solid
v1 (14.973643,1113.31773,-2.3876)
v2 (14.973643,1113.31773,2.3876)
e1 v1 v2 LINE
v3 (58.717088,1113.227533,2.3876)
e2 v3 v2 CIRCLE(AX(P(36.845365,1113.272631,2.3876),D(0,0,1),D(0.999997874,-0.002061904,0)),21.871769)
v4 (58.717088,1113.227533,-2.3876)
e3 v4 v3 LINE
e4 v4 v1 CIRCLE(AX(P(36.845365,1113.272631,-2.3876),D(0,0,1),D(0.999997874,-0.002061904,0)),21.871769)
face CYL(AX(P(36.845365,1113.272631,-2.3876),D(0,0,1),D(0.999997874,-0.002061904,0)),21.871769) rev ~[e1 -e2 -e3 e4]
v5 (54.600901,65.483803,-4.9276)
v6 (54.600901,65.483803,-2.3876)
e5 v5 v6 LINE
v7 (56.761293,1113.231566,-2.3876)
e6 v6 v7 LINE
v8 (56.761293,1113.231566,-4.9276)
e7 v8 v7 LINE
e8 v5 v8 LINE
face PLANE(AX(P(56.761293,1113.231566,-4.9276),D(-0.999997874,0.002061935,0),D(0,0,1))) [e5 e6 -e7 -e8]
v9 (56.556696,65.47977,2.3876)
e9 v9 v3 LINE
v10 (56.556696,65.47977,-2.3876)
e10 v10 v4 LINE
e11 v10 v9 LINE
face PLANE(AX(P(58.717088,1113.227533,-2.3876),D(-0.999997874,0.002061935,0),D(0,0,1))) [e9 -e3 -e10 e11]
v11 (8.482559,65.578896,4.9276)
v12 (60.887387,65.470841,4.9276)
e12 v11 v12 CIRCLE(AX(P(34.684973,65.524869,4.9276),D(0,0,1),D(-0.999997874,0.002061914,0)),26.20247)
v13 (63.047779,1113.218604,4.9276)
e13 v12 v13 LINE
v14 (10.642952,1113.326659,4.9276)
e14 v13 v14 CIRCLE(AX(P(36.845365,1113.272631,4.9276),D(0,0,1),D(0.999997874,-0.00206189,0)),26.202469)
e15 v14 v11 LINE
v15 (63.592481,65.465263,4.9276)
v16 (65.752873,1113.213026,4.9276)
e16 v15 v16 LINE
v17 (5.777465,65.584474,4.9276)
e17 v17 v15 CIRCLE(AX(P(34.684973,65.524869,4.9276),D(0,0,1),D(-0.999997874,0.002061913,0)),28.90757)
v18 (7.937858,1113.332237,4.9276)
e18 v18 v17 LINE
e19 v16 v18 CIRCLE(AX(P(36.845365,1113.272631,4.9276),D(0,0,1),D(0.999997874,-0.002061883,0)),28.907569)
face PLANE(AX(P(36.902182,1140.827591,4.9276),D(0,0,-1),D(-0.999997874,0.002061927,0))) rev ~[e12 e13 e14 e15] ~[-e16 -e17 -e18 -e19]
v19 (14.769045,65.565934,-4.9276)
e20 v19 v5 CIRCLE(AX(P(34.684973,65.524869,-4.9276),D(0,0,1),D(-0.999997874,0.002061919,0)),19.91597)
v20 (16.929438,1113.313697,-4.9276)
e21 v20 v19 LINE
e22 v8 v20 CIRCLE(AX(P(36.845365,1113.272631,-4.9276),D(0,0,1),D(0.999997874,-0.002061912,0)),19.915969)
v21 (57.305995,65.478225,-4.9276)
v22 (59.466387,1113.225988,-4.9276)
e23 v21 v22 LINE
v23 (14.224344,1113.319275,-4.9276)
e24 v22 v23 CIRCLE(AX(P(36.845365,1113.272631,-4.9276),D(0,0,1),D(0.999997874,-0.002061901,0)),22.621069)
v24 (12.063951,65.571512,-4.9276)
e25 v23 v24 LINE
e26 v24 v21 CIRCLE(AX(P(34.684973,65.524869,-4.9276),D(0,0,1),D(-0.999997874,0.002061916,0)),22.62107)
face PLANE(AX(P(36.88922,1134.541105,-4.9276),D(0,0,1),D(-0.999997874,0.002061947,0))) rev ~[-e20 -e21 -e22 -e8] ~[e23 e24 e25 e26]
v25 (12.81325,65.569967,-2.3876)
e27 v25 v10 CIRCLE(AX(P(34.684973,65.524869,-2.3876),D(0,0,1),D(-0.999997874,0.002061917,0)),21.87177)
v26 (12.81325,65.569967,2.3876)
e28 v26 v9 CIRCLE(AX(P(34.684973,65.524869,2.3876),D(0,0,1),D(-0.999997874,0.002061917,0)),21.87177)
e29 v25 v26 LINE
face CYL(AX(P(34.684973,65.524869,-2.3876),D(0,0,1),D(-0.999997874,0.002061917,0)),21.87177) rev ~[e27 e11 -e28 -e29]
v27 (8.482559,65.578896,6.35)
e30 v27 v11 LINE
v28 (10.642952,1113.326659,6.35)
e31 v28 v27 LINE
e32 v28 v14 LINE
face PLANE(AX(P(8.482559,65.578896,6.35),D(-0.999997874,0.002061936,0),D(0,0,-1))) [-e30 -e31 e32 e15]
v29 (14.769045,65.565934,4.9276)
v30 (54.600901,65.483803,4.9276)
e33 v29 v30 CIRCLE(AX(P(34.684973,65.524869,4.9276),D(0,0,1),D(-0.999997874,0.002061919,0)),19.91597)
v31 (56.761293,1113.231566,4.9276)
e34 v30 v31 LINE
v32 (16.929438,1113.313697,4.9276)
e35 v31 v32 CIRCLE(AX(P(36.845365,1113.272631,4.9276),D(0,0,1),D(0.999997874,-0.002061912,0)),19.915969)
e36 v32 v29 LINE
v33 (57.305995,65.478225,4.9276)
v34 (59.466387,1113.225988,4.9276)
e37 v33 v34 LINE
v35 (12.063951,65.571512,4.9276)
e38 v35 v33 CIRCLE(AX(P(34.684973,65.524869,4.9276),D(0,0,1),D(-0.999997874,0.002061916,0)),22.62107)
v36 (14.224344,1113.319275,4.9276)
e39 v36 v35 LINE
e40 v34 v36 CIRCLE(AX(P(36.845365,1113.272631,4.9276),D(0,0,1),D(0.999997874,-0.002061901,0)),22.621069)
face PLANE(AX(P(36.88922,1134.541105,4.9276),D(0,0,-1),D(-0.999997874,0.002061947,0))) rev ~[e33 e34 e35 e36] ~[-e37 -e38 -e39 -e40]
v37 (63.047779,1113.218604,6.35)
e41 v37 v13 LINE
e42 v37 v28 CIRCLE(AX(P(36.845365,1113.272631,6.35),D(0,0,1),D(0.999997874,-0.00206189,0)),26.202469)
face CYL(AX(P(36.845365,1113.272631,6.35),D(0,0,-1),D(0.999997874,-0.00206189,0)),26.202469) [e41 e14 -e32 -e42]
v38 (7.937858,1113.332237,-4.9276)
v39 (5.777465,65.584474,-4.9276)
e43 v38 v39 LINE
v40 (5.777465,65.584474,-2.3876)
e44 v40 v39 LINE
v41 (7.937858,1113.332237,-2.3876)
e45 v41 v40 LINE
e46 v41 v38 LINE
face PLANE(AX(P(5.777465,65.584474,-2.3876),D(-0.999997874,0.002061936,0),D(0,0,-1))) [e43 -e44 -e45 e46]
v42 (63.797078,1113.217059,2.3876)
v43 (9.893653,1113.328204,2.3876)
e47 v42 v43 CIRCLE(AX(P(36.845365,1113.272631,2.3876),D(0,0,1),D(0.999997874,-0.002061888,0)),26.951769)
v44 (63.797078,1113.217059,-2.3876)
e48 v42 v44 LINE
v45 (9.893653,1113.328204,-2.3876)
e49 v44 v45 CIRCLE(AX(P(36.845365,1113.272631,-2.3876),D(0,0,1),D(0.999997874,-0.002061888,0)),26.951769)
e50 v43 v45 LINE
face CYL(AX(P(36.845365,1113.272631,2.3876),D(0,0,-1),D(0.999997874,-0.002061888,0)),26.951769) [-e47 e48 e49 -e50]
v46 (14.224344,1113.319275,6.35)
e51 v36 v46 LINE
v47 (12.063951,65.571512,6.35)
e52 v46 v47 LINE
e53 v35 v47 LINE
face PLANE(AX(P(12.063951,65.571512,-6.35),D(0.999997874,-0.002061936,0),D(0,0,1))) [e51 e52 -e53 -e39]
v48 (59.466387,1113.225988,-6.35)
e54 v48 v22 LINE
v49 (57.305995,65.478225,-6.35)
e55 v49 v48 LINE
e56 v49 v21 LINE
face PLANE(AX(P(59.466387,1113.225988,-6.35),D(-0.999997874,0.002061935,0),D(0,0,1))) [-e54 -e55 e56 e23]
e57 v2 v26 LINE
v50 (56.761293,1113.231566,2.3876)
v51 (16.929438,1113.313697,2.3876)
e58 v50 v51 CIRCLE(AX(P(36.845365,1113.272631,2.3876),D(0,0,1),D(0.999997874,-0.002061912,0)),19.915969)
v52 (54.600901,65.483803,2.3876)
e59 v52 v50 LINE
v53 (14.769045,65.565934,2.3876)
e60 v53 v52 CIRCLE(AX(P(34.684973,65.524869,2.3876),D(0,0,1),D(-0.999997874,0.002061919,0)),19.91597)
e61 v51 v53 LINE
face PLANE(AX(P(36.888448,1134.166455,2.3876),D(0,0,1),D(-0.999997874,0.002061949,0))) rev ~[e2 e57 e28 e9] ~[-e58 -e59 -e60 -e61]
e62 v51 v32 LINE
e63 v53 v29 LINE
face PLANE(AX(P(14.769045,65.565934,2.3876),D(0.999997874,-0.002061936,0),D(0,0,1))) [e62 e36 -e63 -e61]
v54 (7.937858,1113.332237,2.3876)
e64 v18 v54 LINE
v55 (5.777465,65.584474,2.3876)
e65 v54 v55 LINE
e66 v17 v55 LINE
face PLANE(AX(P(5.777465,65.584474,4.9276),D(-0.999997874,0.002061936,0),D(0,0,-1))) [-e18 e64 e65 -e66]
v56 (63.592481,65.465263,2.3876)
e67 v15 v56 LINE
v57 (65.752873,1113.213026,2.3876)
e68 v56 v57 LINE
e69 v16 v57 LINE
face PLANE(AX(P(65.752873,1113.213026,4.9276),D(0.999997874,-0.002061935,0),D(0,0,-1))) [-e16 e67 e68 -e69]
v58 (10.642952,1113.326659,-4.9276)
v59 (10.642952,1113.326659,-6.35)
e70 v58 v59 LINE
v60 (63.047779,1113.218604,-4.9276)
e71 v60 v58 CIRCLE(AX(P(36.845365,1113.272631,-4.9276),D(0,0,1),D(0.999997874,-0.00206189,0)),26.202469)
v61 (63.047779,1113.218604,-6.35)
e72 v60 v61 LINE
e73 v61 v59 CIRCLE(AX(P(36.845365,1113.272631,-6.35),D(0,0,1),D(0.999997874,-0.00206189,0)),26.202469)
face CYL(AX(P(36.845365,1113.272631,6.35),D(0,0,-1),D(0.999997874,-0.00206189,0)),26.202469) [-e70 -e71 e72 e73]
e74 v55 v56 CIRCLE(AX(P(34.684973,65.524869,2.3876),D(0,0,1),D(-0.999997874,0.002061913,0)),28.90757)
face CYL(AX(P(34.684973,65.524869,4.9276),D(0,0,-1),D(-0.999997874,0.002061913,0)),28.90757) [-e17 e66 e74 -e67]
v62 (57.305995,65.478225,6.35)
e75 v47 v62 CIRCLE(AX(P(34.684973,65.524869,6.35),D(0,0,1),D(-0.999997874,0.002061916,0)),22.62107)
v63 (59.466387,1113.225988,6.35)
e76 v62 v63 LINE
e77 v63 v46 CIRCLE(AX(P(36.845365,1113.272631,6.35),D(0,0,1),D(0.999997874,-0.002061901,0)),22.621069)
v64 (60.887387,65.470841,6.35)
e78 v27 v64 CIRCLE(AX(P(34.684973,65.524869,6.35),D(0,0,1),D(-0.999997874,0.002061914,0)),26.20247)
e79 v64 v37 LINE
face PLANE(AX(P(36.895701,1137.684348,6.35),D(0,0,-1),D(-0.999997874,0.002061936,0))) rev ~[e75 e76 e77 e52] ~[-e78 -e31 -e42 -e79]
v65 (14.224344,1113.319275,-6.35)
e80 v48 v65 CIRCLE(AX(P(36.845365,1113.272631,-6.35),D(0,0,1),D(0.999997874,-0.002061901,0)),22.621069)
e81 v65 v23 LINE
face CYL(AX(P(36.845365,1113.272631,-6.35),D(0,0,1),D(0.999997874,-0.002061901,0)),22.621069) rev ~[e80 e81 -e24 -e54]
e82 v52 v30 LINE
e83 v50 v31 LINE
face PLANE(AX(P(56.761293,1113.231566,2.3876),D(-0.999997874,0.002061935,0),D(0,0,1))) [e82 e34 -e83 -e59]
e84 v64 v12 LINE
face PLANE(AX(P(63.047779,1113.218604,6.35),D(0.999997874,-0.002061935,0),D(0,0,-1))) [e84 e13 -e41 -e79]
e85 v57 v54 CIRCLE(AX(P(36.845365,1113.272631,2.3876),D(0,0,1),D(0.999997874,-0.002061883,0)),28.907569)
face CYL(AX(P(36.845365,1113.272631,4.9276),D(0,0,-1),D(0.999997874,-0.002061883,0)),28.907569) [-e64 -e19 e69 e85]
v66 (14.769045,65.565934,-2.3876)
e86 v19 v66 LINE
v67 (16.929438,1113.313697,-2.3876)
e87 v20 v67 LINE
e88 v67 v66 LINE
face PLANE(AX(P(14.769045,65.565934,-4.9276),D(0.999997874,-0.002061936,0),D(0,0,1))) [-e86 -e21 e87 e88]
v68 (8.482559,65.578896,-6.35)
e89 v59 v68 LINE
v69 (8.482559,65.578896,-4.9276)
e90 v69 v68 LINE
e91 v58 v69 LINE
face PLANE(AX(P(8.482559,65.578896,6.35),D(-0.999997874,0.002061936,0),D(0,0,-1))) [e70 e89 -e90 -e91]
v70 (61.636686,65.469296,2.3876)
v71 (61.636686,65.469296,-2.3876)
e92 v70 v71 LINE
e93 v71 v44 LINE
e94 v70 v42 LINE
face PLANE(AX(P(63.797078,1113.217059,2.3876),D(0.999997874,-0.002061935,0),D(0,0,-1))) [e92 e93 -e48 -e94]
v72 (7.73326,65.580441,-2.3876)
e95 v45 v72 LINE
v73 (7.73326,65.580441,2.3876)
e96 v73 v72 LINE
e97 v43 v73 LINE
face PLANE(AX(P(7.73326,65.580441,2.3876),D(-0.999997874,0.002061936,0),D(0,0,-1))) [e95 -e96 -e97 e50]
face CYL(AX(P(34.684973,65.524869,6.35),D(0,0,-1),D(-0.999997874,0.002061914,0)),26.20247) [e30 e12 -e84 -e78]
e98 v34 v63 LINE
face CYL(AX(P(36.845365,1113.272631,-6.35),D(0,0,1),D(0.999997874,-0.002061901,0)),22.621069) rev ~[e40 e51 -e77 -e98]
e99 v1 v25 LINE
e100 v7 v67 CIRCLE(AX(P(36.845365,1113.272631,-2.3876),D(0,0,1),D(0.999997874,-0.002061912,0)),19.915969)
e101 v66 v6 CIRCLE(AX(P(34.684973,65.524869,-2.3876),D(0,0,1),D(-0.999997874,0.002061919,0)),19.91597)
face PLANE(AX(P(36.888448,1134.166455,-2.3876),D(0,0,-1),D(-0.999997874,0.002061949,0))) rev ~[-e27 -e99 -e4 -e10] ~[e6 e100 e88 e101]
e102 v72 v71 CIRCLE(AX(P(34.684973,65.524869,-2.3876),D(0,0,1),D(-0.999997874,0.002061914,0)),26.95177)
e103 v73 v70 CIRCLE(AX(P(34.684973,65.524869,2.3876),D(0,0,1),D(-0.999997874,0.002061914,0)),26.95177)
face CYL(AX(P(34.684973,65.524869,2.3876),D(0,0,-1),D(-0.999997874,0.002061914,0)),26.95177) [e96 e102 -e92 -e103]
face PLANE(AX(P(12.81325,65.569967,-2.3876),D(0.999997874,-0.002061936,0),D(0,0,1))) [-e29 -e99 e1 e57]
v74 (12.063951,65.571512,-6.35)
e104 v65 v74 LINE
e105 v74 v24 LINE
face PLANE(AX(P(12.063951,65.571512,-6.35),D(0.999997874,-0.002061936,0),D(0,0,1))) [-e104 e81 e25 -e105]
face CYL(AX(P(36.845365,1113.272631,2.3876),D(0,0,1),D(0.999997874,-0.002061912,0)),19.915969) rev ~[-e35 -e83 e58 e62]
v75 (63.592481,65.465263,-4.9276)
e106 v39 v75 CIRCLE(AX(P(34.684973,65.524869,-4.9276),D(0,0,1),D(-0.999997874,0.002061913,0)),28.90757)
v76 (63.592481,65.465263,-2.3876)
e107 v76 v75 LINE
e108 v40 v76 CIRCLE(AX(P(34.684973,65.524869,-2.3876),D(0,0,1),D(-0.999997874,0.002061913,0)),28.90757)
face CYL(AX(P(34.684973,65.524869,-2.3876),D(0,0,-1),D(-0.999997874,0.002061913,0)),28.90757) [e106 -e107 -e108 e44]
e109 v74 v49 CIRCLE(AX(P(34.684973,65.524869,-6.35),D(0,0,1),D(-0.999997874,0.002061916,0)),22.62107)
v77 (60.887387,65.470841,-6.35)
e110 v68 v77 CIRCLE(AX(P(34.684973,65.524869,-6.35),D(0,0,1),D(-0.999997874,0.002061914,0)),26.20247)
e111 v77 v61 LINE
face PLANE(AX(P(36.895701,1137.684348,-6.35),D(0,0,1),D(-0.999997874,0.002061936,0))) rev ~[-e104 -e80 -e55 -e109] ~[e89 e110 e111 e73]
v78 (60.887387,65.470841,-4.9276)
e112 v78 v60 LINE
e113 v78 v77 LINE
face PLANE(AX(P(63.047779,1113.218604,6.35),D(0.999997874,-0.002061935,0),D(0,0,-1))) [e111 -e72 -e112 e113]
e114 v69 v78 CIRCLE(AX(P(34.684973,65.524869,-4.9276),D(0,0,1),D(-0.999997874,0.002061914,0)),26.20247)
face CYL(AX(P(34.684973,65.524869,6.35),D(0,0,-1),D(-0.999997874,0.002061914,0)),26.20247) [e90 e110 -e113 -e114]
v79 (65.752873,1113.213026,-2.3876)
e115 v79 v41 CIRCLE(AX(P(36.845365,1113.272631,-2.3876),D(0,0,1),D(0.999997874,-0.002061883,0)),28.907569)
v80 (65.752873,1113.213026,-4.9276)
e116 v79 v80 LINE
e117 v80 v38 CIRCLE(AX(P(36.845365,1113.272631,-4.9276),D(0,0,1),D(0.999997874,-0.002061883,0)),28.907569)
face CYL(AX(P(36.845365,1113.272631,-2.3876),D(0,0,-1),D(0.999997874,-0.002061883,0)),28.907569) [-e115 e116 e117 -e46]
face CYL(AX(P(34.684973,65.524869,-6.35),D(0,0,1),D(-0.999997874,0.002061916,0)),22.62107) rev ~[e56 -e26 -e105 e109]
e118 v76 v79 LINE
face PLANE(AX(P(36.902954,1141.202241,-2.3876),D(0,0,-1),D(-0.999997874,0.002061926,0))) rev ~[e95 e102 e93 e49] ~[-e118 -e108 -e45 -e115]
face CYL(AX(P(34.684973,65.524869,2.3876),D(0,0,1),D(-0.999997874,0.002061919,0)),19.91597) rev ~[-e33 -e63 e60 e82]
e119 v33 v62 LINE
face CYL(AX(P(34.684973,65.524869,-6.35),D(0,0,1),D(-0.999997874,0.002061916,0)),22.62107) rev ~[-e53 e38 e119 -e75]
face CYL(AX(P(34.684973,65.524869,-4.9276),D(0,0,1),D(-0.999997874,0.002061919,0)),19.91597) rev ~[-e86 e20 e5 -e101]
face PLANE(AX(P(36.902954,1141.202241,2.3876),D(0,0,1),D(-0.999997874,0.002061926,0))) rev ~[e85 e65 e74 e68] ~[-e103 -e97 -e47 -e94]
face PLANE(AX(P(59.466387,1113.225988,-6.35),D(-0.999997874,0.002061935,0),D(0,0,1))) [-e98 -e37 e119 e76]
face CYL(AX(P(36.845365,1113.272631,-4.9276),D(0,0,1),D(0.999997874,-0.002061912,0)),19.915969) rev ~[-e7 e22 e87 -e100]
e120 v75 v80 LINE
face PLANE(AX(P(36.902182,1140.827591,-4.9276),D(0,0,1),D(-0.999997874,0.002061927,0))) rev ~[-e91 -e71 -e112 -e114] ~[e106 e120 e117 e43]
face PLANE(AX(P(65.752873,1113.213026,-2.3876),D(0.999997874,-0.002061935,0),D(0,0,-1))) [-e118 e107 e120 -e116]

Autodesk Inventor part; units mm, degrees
ref_plane "Work Plane2" through (36.845366, 1113.272631, 0) normal (-1, 0, 0) x (0, 0, 1)
ref_plane "Work Plane3" through (34.684973, 65.524869, 0) normal (0.3826834, 0.9238795, 0) x (0, 0, 1)
sketch "Path" plane through (0, 0, 0) normal (0, 0, 1) x (1, 0, 0)
  arc A0 (61.257083, 1113.222296) -> (12.433648, 1113.322967) centre (36.845366, 1113.272631) ccw
  arc A1 (10.273255, 65.575204) -> (59.096691, 65.474533) centre (34.684973, 65.524869) ccw
  line L0 (10.273255, 65.575204) -> (12.433648, 1113.322967)
  line L1 (61.257083, 1113.222296) -> (59.096691, 65.474533)
  dimension "d31" = 8.9916
ref_plane "Section Plane" through (12.433648, 1113.322967, 0) normal (-0.0020619, -0.9999979, 0) x (0, 0, 1)
sketch "Section Sketch" plane through (12.433648, 1113.322967, 0) normal (-0.0020619, -0.9999979, 0) x (0, 0, 1)
  line L0 (-6.35, -1.7907) -> (6.35, -1.7907)
  line L1 (6.35, -1.7907) -> (6.35, 1.7907)
  line L2 (6.35, 1.7907) -> (-6.35, 1.7907)
  line L3 (-6.35, 1.7907) -> (-6.35, -1.7907)
  line L4 (-2.3876, -2.54) -> (2.3876, -2.54)
  line L5 (2.3876, -2.54) -> (2.3876, 2.54)
  line L6 (2.3876, 2.54) -> (-2.3876, 2.54)
  line L7 (-2.3876, 2.54) -> (-2.3876, -2.54)
  line L8 (-2.3876, 0) -> (2.3876, 0) construction
  line L9 (-4.9276, -4.4958) -> (-2.3876, -4.4958)
  line L10 (-2.3876, -4.4958) -> (-2.3876, 4.4958)
  line L11 (-2.3876, 4.4958) -> (-4.9276, 4.4958)
  line L12 (-4.9276, 4.4958) -> (-4.9276, -4.4958)
  line L13 (2.3876, -4.4958) -> (4.9276, -4.4958)
  line L14 (4.9276, -4.4958) -> (4.9276, 4.4958)
  line L15 (4.9276, 4.4958) -> (2.3876, 4.4958)
  line L16 (2.3876, 4.4958) -> (2.3876, -4.4958)
  line L17 (-6.35, 0) -> (6.35, 0) construction
  point P0 (0, 0)
  point P1 (0, 0)
  dimension "d21" = 3.5814
  dimension "d22" = 5.08
  dimension "d23" = 4.7752
  dimension "d24" = 2.54
  dimension "d31" = 8.9916
  dimension "d32" = 12.7
sweep "Solid" add profiles "Section Sketch" path "Path"
pattern_of_one "Strand Pattern"
equation "\"d21\" = da_d2"
equation "\"d22\" = da_d1"
equation "\"d23\" = da_b1"
equation "\"d24\" = da_t1 + da_t2"
equation "\"d30\" = da_pt"
equation "\"da_p\" = 9.525"
equation "\"da_b1\" = 4.7752"
equation "\"da_h2\" = 8.9916"
equation "\"da_h3\" = 7.7978"
equation "\"da_d1\" = 5.08"
equation "\"da_d2\" = 3.5814"
equation "\"da_pt\" = 10.1346"
equation "\"da_b\" = 12.7"
equation "\"da_t1\" = 1.27"
equation "\"da_t2\" = 1.27"
properties part number "Roller Chain"
